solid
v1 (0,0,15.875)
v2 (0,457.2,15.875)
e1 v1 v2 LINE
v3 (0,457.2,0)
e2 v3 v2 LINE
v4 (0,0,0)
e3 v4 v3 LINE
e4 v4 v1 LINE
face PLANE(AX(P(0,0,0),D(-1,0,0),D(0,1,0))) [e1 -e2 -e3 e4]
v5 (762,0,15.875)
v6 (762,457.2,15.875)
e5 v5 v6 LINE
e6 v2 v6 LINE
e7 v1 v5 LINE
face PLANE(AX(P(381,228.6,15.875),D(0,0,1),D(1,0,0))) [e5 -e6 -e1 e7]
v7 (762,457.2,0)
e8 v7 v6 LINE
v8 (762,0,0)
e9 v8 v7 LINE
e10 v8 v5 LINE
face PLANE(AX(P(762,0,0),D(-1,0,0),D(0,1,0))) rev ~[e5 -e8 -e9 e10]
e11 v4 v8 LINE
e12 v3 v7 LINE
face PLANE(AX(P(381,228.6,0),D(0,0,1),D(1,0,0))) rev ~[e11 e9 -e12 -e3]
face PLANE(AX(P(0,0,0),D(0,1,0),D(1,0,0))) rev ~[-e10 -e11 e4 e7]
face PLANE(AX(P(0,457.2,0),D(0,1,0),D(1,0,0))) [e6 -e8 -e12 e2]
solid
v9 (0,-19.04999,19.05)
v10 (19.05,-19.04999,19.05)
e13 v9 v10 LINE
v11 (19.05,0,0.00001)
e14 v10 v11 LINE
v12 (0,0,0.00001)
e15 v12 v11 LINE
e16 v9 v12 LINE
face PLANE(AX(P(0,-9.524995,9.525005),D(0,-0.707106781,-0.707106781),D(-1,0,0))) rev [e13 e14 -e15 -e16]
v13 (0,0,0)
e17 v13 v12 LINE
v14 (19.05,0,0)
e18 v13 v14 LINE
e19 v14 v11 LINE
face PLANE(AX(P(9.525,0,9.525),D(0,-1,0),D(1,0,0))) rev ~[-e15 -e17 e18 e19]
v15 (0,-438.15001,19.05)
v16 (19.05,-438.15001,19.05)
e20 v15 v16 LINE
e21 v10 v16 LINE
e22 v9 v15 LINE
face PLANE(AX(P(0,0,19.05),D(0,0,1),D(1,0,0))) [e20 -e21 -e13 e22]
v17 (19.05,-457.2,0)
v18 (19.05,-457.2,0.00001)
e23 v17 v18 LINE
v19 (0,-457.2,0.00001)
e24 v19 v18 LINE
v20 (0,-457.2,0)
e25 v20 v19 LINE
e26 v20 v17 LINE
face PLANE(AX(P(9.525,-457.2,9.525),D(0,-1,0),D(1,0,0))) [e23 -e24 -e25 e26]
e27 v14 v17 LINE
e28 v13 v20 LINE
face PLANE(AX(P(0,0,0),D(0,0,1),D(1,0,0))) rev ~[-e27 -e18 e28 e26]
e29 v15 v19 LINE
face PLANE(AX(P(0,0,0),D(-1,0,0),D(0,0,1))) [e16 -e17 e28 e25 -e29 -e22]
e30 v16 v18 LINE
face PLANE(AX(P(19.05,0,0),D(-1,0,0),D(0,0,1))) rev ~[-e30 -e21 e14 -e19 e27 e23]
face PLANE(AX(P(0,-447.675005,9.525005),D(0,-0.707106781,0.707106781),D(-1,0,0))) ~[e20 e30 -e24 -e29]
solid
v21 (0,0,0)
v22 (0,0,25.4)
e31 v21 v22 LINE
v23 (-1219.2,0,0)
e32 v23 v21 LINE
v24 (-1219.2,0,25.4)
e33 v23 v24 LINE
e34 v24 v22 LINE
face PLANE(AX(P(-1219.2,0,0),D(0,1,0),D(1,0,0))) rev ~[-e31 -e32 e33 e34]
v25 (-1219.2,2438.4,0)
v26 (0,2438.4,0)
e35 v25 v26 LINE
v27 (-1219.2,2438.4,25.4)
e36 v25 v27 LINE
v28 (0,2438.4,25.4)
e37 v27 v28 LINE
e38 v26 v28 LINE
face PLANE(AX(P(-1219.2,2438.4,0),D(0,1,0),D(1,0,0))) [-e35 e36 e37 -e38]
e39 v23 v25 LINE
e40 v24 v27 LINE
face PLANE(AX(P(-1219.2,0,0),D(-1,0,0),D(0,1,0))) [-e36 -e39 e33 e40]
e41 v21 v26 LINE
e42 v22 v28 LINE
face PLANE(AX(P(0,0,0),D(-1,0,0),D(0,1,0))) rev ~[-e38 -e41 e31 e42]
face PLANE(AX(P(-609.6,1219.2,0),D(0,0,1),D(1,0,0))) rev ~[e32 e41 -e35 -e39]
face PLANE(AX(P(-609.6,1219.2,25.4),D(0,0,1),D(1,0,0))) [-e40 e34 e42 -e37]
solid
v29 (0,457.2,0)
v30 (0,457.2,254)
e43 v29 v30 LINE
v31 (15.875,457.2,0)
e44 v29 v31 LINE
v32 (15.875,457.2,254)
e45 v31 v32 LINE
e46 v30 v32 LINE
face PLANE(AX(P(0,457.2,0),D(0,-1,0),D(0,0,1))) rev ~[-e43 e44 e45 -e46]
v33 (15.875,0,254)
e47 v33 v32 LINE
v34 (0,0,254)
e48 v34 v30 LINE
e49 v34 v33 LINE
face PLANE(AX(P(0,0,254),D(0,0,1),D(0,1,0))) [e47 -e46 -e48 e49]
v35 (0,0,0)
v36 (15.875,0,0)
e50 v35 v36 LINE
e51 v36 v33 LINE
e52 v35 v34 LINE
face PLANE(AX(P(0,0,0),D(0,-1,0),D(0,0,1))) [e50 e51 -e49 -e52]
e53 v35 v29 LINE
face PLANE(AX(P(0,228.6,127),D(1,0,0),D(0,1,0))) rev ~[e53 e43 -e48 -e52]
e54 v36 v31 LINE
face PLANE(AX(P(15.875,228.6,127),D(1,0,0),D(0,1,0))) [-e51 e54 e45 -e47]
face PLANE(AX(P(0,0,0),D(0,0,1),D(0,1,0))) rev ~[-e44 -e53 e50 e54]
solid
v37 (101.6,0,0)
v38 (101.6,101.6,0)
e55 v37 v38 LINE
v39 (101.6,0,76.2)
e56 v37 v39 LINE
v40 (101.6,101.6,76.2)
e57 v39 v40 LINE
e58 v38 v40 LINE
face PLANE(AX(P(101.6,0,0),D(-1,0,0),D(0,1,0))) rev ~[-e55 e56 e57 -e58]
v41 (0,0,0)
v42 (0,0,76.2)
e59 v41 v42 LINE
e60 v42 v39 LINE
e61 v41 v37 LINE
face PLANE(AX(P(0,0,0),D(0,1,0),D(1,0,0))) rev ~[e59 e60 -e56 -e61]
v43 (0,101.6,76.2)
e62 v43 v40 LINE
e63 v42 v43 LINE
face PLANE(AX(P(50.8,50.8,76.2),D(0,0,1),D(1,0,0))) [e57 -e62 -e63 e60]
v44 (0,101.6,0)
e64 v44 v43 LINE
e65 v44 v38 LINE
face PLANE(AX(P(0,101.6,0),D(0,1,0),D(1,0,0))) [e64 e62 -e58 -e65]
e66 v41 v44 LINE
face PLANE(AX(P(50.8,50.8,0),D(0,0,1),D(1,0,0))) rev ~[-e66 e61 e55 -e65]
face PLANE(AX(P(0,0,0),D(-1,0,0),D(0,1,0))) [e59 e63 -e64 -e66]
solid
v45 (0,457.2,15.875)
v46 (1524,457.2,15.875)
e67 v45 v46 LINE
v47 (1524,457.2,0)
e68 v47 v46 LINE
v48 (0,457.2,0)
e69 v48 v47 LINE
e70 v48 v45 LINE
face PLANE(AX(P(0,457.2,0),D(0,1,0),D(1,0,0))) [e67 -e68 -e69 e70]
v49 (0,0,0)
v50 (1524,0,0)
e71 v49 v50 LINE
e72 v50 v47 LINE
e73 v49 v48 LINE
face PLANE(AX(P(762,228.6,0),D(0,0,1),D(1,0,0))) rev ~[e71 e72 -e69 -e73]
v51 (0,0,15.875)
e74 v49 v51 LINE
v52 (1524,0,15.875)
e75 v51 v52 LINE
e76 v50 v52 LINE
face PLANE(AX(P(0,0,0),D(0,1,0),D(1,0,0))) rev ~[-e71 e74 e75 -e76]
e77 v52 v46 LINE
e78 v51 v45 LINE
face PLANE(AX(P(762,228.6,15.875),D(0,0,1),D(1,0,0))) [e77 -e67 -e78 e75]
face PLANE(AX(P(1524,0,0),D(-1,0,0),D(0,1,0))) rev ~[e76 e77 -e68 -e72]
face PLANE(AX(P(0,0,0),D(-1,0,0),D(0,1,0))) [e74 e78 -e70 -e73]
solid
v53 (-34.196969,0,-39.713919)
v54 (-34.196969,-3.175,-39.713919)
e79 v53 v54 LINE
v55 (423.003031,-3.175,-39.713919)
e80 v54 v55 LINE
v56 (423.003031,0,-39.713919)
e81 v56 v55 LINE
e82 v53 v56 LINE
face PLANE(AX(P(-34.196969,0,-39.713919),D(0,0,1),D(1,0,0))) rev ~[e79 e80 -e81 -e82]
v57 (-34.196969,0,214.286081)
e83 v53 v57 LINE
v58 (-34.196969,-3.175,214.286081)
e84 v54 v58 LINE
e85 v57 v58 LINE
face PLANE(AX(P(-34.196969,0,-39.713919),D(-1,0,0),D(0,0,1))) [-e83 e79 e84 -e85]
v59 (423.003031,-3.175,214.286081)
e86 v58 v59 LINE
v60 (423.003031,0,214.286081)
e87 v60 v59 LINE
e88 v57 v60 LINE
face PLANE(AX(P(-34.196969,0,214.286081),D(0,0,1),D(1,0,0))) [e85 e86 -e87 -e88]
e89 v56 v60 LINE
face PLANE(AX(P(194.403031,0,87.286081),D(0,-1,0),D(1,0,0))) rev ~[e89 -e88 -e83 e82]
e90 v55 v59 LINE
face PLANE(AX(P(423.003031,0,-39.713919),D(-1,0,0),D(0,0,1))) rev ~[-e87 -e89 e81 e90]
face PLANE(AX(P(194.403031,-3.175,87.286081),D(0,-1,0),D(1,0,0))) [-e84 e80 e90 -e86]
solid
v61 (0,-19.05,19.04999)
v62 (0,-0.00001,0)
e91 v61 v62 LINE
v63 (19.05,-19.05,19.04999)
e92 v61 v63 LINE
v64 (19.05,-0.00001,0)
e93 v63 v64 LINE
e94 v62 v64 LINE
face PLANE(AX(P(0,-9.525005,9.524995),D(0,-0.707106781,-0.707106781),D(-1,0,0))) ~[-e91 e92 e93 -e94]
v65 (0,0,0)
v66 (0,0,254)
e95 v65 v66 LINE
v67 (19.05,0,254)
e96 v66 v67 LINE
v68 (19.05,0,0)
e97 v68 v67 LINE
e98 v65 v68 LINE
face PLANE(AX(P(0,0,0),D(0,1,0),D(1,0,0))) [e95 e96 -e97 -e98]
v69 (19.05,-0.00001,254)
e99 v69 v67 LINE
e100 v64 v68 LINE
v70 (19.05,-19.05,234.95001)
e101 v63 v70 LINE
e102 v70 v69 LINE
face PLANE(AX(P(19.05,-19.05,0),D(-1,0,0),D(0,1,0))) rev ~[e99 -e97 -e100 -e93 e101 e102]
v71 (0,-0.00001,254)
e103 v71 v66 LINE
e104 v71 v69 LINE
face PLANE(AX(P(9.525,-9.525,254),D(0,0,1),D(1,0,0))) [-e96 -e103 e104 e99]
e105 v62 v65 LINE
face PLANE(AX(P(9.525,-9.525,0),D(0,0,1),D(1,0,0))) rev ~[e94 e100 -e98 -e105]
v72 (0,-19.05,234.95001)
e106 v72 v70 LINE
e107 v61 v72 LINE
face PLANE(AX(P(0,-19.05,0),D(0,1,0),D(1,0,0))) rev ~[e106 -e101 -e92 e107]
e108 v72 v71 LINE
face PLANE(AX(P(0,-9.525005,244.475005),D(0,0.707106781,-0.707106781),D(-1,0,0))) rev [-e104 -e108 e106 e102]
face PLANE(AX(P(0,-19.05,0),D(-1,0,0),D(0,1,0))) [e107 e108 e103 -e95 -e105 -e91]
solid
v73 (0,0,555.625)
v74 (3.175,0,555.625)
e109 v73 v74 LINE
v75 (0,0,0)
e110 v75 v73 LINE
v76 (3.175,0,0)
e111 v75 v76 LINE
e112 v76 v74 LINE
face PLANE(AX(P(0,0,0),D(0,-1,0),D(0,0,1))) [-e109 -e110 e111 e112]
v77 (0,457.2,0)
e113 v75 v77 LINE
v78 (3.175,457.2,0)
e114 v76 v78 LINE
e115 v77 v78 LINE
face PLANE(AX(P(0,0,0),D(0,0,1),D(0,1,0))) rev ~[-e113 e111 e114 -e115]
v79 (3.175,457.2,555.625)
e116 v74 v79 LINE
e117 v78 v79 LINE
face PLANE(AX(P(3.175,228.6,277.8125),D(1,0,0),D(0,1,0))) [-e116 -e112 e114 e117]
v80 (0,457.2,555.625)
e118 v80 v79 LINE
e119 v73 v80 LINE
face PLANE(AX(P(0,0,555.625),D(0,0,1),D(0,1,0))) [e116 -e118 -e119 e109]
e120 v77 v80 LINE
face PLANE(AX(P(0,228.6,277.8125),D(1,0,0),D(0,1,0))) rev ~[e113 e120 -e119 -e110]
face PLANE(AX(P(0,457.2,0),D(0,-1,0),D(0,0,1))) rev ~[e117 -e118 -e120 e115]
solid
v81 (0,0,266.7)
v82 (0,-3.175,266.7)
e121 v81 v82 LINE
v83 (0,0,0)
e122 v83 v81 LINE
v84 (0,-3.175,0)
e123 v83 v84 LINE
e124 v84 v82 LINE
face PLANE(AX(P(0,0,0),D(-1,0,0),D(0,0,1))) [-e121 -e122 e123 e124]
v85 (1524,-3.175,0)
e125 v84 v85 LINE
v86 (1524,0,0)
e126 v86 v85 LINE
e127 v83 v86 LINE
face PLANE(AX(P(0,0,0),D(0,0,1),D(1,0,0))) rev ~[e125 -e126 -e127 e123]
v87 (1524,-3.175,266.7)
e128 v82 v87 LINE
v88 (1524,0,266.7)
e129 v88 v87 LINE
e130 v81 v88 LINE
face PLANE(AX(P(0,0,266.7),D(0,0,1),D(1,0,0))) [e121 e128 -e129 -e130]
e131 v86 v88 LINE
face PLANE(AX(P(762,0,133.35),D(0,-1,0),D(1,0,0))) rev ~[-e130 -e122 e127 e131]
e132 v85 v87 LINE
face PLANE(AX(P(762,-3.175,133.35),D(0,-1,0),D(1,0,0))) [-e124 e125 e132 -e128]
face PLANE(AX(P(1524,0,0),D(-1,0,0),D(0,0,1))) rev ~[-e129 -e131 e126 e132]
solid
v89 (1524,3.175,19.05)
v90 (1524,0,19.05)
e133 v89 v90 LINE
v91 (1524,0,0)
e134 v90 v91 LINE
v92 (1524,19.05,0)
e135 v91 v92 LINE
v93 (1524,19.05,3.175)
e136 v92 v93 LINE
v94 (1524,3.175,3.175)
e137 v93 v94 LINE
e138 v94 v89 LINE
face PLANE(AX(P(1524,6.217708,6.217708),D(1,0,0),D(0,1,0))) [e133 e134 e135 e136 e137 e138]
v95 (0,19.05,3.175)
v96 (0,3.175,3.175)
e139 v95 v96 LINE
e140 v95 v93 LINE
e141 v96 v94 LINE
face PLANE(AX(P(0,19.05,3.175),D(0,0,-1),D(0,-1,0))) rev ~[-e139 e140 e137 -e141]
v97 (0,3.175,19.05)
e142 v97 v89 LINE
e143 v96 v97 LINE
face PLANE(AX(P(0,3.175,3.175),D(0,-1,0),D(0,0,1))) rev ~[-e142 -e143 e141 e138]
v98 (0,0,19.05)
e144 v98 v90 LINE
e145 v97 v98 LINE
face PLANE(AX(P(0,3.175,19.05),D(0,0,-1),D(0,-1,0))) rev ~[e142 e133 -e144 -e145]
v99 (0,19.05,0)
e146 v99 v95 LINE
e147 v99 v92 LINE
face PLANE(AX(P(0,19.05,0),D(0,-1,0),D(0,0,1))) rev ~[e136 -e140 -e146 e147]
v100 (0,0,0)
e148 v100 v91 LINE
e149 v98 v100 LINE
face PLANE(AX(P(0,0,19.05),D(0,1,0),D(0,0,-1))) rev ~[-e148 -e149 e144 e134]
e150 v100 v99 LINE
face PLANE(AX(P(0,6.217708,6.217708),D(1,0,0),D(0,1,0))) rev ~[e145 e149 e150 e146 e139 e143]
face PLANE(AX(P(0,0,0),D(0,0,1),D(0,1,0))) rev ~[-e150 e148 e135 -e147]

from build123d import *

# Parameters (mm, degrees)
F0_W      = 1524
F0_H      = 457.2
F1_DEPTH  = 15.875
F2_W      = 457.2
F2_H      = 254
F3_DEPTH  = 15.875
F4_W      = 101.6
F4_H      = 101.6
F5_DEPTH  = 76.2
F7_DEPTH  = 1524
F8_W      = 19.05
F8_H      = 19.05
F9_DEPTH  = 457.2
F10_SIZE  = 19.04999
F11_W     = 19.05
F11_H     = 19.05
F12_DEPTH = 254
F13_SIZE  = 19.04999
F14_W     = 457.2
F14_H     = 254
F15_DEPTH = 3.175
F16_W     = 457.2
F16_H     = 555.625
F17_DEPTH = 3.175
F18_W     = 1524
F18_H     = 266.7
F19_DEPTH = 3.175
F21_W     = 762
F21_H     = 457.2
F22_DEPTH = 15.875
F20_W     = 1219.2
F20_H     = 2438.4
F23_DEPTH = 25.4


# Not quite as in the source:
# - a fillet or chamfer is up to 0.001 mm smaller than in the source, because OpenCascade refuses the exact size


with BuildPart() as f1:
    # F0 (on Top) → F1 (new body)
    with BuildSketch(Plane.XY):
        with Locations((762, 228.6)):
            Rectangle(F0_W, F0_H)
    extrude(amount=F1_DEPTH)


with BuildPart() as f3:
    # F2 (on Right) → F3 (new body)
    with BuildSketch(Plane.YZ):
        with Locations((228.6, 127)):
            Rectangle(F2_W, F2_H)
    extrude(amount=F3_DEPTH)


with BuildPart() as f5:
    # F4 (on Top) → F5 (new body)
    with BuildSketch(Plane.XY):
        with Locations((50.8, 50.8)):
            Rectangle(F4_W, F4_H)
    extrude(amount=F5_DEPTH)


with BuildPart() as f7:
    # F6 (on Right) → F7 (new body)
    with BuildSketch(Plane.YZ):
        Polygon((0, 19.05), (0, 0), (19.05, 0), (19.05, 3.175), (3.175, 3.175), (3.175, 19.05), align=None)
    extrude(amount=F7_DEPTH)


with BuildPart() as f9:
    # F8 (on Front) → F9 (new body)
    with BuildSketch(Plane.XZ):
        with Locations((9.525, 9.525)):
            Rectangle(F8_W, F8_H)
    extrude(amount=F9_DEPTH)

    # F10 (size 19.05 in the source; OpenCascade refuses exactly that, so slightly less here)
    f10_edges = [f9.edges().sort_by_distance(p)[0] for p in [
        (9.525, -457.2, 19.05),
        (9.525, 0, 19.05),
    ]]
    chamfer(f10_edges, length=F10_SIZE)


with BuildPart() as f12:
    # F11 (on Top) → F12 (new body)
    with BuildSketch(Plane.XY):
        with Locations((9.525, -9.525)):
            Rectangle(F11_W, F11_H)
    extrude(amount=F12_DEPTH)

    # F13 (size 19.05 in the source; OpenCascade refuses exactly that, so slightly less here)
    f13_edges = [f12.edges().sort_by_distance(p)[0] for p in [
        (9.525, -19.05, 254),
        (9.525, -19.05, 0),
    ]]
    chamfer(f13_edges, length=F13_SIZE)


with BuildPart() as f15:
    # F14 (on Front) → F15 (new body)
    with BuildSketch(Plane.XZ):
        with Locations((194.4030308783, 87.2860808372)):
            Rectangle(F14_W, F14_H)
    extrude(amount=F15_DEPTH)


with BuildPart() as f17:
    # F16 (on Right) → F17 (new body)
    with BuildSketch(Plane.YZ):
        with Locations((228.6, 277.8125)):
            Rectangle(F16_W, F16_H)
    extrude(amount=F17_DEPTH)


with BuildPart() as f19:
    # F18 (on Front) → F19 (new body)
    with BuildSketch(Plane.XZ):
        with Locations((762, 133.35)):
            Rectangle(F18_W, F18_H)
    extrude(amount=F19_DEPTH)


with BuildPart() as f22:
    # F21 (on Top) → F22 (new body)
    with BuildSketch(Plane.XY):
        with Locations((381, 228.6)):
            Rectangle(F21_W, F21_H)
    extrude(amount=F22_DEPTH)


with BuildPart() as f23:
    # F20 (on Top) → F23 (new body)
    with BuildSketch(Plane.XY):
        with Locations((-609.6, 1219.2)):
            Rectangle(F20_W, F20_H)
    extrude(amount=F23_DEPTH)


solid = Compound([f1.part, f3.part, f5.part, f7.part, f9.part, f12.part, f15.part, f17.part, f19.part, f22.part, f23.part])
